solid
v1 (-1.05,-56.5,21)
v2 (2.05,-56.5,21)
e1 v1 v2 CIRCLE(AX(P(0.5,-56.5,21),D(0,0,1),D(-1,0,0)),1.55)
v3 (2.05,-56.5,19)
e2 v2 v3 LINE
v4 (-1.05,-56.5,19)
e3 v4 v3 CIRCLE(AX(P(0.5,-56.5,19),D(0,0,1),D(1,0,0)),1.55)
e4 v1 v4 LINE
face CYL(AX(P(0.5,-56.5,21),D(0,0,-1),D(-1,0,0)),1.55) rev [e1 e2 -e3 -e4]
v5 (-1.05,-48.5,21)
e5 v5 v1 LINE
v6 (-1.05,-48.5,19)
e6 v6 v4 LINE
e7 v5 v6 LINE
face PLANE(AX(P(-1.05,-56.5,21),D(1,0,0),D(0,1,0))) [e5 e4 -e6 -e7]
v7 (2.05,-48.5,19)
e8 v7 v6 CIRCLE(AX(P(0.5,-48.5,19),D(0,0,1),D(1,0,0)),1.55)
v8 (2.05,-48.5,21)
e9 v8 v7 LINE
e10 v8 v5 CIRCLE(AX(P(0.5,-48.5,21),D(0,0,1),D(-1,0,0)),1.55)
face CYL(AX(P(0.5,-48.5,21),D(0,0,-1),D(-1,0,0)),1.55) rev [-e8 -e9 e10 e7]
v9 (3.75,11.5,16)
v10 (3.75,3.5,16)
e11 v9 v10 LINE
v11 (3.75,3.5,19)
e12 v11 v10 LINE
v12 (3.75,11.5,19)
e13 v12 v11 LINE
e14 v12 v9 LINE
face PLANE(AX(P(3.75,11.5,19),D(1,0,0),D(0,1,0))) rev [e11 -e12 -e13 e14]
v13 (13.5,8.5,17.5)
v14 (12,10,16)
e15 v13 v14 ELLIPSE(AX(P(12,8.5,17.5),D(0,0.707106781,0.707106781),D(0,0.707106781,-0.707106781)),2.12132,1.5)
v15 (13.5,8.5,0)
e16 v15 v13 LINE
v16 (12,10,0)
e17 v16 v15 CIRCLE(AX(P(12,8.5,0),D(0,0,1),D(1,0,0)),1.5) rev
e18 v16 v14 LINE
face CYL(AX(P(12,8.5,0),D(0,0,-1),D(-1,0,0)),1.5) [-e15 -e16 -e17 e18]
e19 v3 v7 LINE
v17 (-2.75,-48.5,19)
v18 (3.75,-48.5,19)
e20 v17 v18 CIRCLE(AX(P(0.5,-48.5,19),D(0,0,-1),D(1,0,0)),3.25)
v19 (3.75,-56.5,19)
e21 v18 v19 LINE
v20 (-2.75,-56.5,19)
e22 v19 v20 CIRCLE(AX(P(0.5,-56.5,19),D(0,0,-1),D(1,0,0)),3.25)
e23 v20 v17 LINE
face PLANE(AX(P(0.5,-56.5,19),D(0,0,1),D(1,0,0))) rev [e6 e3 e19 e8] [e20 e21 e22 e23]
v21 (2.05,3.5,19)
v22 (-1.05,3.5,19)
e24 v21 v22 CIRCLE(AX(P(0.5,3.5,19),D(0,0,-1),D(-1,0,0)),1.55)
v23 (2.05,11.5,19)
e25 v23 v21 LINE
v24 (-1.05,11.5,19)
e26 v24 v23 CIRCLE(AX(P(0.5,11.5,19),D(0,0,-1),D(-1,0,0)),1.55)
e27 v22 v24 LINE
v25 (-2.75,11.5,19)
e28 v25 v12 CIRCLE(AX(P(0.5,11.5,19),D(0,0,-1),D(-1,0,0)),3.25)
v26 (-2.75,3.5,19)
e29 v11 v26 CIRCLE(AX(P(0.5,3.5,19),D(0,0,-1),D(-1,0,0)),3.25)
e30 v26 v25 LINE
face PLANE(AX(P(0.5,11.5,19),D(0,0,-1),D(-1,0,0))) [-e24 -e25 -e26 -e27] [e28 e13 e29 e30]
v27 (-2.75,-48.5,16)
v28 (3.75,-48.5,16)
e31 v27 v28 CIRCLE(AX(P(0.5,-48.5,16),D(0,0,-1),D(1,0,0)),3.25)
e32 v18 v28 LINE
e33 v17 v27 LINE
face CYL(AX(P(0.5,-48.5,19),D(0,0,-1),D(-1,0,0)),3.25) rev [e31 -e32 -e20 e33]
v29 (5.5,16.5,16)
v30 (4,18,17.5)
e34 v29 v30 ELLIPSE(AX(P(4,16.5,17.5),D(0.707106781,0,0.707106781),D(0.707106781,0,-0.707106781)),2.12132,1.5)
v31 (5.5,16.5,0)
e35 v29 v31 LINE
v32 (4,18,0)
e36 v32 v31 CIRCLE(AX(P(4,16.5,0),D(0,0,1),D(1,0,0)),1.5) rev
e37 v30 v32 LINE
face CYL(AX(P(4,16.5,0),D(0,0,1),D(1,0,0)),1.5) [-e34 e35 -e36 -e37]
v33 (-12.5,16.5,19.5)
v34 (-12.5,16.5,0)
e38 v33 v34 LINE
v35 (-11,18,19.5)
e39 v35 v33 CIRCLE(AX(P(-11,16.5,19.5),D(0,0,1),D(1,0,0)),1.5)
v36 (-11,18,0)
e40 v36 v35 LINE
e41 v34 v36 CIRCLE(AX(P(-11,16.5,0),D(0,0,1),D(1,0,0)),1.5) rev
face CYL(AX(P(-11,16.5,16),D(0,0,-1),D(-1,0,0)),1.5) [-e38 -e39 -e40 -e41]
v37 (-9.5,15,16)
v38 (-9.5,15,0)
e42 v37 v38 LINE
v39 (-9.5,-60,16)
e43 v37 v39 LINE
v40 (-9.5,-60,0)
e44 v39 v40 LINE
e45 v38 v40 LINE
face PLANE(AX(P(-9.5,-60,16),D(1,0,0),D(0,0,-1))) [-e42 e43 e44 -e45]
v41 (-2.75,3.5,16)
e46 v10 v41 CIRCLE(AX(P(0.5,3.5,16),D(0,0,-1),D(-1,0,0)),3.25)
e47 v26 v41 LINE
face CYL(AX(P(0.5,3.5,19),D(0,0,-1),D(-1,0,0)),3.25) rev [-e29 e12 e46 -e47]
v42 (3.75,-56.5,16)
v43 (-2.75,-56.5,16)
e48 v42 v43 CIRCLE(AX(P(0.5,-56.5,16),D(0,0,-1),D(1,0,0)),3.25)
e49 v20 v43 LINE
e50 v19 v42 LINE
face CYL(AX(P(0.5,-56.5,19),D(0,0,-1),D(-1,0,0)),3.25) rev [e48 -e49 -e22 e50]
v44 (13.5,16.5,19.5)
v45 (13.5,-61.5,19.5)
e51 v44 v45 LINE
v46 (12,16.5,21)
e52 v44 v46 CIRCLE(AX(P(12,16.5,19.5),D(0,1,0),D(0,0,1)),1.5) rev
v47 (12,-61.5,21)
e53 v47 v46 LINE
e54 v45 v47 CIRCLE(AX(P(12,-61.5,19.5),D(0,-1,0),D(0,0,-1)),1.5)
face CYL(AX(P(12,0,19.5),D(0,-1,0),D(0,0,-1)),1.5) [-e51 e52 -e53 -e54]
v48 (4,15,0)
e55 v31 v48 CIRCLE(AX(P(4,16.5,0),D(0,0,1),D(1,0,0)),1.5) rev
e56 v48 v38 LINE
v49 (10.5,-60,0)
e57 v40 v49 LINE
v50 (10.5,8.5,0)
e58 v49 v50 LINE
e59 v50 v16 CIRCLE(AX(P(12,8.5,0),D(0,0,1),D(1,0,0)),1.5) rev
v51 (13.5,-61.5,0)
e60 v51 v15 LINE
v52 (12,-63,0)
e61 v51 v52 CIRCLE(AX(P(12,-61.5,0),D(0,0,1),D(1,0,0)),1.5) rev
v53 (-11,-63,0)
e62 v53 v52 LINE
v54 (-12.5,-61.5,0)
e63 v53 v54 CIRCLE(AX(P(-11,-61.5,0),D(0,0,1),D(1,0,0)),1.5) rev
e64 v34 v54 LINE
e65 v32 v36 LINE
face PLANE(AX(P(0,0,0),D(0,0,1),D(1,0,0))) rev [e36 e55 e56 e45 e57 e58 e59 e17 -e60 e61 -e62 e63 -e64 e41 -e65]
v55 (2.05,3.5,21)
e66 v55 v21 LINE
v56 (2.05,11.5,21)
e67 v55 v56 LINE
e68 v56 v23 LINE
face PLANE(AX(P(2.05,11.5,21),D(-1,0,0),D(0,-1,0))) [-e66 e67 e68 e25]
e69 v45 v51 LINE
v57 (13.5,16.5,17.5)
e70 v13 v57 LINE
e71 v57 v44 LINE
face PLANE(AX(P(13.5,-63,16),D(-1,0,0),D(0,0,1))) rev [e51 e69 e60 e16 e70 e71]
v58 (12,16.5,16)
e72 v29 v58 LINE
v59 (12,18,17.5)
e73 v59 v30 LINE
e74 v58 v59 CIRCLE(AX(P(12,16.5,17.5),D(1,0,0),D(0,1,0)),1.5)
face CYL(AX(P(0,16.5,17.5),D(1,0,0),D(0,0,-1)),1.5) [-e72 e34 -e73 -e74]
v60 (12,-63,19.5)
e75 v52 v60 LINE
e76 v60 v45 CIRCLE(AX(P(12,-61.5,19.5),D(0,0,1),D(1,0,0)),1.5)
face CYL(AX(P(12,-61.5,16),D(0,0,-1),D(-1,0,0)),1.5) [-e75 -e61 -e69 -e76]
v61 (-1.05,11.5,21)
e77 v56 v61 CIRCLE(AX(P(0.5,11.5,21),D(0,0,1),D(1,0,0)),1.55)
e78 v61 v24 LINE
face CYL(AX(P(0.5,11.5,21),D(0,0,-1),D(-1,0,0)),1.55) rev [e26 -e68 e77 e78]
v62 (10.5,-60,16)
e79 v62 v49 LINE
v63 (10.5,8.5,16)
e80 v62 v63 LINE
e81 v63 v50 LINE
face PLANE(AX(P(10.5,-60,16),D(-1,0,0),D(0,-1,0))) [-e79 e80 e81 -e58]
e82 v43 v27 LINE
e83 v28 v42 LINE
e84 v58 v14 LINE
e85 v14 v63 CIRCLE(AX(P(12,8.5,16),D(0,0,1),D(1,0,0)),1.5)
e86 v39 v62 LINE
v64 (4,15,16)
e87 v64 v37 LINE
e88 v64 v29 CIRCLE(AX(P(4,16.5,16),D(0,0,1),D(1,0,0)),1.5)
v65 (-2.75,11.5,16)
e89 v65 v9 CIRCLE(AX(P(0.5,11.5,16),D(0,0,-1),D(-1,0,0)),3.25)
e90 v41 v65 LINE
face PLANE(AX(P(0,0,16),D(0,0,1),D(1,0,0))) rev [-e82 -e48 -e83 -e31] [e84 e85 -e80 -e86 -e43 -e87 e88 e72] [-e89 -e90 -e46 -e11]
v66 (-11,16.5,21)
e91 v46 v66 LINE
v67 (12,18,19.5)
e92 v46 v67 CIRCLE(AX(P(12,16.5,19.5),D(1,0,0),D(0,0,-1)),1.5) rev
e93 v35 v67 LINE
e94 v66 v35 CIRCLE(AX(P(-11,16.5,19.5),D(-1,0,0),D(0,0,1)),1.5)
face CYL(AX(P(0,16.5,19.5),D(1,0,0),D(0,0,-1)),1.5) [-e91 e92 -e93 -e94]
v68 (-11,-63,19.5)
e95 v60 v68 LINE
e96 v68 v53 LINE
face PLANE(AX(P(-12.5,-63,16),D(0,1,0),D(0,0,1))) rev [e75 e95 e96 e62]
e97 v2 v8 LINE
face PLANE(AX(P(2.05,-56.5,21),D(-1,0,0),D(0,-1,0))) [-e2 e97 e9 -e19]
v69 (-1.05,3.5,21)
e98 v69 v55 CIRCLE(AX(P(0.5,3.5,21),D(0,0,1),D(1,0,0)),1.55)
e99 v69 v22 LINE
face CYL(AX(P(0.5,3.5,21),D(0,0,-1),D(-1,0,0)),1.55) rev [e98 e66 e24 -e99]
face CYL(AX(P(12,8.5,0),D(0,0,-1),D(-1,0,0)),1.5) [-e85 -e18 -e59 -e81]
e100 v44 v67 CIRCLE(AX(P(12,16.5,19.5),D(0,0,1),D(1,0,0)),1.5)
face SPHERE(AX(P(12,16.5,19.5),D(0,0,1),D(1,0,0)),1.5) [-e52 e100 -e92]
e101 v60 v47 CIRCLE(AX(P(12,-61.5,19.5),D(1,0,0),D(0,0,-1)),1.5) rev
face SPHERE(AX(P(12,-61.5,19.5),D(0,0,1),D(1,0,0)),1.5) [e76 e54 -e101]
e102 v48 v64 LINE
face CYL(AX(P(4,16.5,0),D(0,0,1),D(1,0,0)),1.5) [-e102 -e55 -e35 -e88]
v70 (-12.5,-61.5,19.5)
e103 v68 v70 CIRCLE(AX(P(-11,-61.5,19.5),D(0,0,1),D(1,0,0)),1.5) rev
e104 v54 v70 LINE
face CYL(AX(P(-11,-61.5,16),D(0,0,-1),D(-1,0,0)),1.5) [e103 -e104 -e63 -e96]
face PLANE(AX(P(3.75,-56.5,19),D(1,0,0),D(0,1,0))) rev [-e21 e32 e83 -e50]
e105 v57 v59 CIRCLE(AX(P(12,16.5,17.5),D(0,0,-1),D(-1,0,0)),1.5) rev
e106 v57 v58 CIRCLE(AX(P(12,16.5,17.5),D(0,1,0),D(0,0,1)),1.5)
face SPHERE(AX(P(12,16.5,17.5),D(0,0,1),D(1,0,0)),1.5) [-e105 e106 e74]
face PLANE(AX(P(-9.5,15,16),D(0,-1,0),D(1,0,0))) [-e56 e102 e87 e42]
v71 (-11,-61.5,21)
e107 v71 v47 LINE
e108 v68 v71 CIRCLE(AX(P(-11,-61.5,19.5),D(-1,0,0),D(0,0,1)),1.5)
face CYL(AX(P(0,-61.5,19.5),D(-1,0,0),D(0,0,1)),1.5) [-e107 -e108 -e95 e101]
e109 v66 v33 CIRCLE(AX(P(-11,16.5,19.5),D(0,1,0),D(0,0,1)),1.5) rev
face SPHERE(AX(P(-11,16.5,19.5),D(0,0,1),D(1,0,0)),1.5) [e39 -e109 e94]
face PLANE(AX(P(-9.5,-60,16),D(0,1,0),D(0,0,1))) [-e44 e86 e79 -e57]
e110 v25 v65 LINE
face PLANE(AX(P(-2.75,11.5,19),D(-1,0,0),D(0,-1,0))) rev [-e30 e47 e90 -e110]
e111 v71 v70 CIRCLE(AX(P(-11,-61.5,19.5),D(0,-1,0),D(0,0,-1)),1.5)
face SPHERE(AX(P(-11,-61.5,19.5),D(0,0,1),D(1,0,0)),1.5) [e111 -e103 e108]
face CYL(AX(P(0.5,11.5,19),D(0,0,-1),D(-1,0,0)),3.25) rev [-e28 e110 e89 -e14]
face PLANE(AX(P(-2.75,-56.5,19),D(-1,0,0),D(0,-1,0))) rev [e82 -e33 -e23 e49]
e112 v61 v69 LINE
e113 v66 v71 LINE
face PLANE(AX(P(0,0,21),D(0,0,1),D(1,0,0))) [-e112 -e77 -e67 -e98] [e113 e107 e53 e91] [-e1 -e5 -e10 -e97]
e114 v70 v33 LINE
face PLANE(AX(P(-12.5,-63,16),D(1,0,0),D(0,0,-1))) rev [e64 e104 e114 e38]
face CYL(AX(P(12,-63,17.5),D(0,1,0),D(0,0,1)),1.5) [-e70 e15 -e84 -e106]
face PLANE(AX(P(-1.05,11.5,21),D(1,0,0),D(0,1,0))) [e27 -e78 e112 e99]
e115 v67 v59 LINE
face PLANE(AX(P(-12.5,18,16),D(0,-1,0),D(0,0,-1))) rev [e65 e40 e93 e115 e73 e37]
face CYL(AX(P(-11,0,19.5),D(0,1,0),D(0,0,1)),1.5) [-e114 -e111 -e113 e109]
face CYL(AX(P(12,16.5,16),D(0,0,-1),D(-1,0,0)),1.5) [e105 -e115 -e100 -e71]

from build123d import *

# Parameters (mm, degrees)
SKETCH1_W           = 26
SKETCH1_H           = 81
SKETCH1_W_2         = 20
SKETCH1_H_2         = 75
BOSS_EXTRUDE5_DEPTH = 16
SKETCH7_W           = 26
SKETCH7_H           = 81
BOSS_EXTRUDE6_DEPTH = 5
CUT_EXTRUDE3_DEPTH  = 3
SKETCH9_W           = 8
SKETCH9_H           = 16
CUT_EXTRUDE4_DEPTH  = 8
FILLET3_R           = 1.5


with BuildPart() as part:
    # Sketch1 → Boss-Extrude5 (new body)
    with BuildSketch(Plane.XY):
        with Locations((0.5, -22.5)):
            Rectangle(SKETCH1_W, SKETCH1_H)
        with Locations((0.5, -22.5)):
            Rectangle(SKETCH1_W_2, SKETCH1_H_2, mode=Mode.SUBTRACT)
    extrude(amount=BOSS_EXTRUDE5_DEPTH)

    # Sketch7 → Boss-Extrude6 (add)
    with BuildSketch(Plane.XY.offset(16)):
        with Locations((0.5, -22.5)):
            Rectangle(SKETCH7_W, SKETCH7_H)
        with BuildLine():
            Line((2.05, 11.5), (2.05, 3.5))
            ThreePointArc((2.05, 3.5), (0.5, 1.95), (-1.05, 3.5))
            Line((-1.05, 3.5), (-1.05, 11.5))
            ThreePointArc((-1.05, 11.5), (0.5, 13.05), (2.05, 11.5))
        make_face(mode=Mode.SUBTRACT)
        with BuildLine():
            Line((2.05, -56.5), (2.05, -48.5))
            ThreePointArc((2.05, -48.5), (0.5, -46.95), (-1.05, -48.5))
            Line((-1.05, -48.5), (-1.05, -56.5))
            ThreePointArc((-1.05, -56.5), (0.5, -58.05), (2.05, -56.5))
        make_face(mode=Mode.SUBTRACT)
    extrude(amount=BOSS_EXTRUDE6_DEPTH)

    # Sketch8 → Cut-Extrude3 (cut)
    with BuildSketch(Plane(origin=(0, 0, 16), x_dir=(-1, 0, 0), z_dir=(0, 0, -1))):
        with BuildLine():
            Line((2.75, 11.5), (2.75, 3.5))
            ThreePointArc((2.75, 3.5), (-0.5, 0.25), (-3.75, 3.5))
            Line((-3.75, 3.5), (-3.75, 11.5))
            ThreePointArc((-3.75, 11.5), (-0.5, 14.75), (2.75, 11.5))
        make_face()
        with BuildLine():
            Line((2.75, -56.5), (2.75, -48.5))
            ThreePointArc((2.75, -48.5), (-0.5, -45.25), (-3.75, -48.5))
            Line((-3.75, -48.5), (-3.75, -56.5))
            ThreePointArc((-3.75, -56.5), (-0.5, -59.75), (2.75, -56.5))
        make_face()
    extrude(amount=-CUT_EXTRUDE3_DEPTH, mode=Mode.SUBTRACT)

    # Sketch9 → Cut-Extrude4 (cut)
    with BuildSketch(Plane(origin=(0, 18, 0), x_dir=(1, 0, 0), z_dir=(0, 1, 0))):
        with Locations((9.5, -8)):
            Rectangle(SKETCH9_W, SKETCH9_H)
    extrude(amount=-CUT_EXTRUDE4_DEPTH, mode=Mode.SUBTRACT)

    # Fillet3
    fillet3_edges = [part.edges().sort_by_distance(p)[0] for p in [
        (-12.5, -63, 10.5),
        (0.5, -63, 21),
        (13.5, -63, 10.5),
        (13.5, -22.5, 21),
        (9.5, 18, 16),
        (13.5, 14, 16),
        (-12.5, -22.5, 21),
        (10.5, 10, 8),
        (5.5, 15, 8),
        (5.5, 18, 8),
        (13.5, 10, 8),
        (13.5, 18, 18.5),
        (-12.5, 18, 10.5),
        (0.5, 18, 21),
    ]]
    fillet(fillet3_edges, radius=FILLET3_R - 0.0001)  # a hair under: the kernel refuses the full size


solid = part.part
